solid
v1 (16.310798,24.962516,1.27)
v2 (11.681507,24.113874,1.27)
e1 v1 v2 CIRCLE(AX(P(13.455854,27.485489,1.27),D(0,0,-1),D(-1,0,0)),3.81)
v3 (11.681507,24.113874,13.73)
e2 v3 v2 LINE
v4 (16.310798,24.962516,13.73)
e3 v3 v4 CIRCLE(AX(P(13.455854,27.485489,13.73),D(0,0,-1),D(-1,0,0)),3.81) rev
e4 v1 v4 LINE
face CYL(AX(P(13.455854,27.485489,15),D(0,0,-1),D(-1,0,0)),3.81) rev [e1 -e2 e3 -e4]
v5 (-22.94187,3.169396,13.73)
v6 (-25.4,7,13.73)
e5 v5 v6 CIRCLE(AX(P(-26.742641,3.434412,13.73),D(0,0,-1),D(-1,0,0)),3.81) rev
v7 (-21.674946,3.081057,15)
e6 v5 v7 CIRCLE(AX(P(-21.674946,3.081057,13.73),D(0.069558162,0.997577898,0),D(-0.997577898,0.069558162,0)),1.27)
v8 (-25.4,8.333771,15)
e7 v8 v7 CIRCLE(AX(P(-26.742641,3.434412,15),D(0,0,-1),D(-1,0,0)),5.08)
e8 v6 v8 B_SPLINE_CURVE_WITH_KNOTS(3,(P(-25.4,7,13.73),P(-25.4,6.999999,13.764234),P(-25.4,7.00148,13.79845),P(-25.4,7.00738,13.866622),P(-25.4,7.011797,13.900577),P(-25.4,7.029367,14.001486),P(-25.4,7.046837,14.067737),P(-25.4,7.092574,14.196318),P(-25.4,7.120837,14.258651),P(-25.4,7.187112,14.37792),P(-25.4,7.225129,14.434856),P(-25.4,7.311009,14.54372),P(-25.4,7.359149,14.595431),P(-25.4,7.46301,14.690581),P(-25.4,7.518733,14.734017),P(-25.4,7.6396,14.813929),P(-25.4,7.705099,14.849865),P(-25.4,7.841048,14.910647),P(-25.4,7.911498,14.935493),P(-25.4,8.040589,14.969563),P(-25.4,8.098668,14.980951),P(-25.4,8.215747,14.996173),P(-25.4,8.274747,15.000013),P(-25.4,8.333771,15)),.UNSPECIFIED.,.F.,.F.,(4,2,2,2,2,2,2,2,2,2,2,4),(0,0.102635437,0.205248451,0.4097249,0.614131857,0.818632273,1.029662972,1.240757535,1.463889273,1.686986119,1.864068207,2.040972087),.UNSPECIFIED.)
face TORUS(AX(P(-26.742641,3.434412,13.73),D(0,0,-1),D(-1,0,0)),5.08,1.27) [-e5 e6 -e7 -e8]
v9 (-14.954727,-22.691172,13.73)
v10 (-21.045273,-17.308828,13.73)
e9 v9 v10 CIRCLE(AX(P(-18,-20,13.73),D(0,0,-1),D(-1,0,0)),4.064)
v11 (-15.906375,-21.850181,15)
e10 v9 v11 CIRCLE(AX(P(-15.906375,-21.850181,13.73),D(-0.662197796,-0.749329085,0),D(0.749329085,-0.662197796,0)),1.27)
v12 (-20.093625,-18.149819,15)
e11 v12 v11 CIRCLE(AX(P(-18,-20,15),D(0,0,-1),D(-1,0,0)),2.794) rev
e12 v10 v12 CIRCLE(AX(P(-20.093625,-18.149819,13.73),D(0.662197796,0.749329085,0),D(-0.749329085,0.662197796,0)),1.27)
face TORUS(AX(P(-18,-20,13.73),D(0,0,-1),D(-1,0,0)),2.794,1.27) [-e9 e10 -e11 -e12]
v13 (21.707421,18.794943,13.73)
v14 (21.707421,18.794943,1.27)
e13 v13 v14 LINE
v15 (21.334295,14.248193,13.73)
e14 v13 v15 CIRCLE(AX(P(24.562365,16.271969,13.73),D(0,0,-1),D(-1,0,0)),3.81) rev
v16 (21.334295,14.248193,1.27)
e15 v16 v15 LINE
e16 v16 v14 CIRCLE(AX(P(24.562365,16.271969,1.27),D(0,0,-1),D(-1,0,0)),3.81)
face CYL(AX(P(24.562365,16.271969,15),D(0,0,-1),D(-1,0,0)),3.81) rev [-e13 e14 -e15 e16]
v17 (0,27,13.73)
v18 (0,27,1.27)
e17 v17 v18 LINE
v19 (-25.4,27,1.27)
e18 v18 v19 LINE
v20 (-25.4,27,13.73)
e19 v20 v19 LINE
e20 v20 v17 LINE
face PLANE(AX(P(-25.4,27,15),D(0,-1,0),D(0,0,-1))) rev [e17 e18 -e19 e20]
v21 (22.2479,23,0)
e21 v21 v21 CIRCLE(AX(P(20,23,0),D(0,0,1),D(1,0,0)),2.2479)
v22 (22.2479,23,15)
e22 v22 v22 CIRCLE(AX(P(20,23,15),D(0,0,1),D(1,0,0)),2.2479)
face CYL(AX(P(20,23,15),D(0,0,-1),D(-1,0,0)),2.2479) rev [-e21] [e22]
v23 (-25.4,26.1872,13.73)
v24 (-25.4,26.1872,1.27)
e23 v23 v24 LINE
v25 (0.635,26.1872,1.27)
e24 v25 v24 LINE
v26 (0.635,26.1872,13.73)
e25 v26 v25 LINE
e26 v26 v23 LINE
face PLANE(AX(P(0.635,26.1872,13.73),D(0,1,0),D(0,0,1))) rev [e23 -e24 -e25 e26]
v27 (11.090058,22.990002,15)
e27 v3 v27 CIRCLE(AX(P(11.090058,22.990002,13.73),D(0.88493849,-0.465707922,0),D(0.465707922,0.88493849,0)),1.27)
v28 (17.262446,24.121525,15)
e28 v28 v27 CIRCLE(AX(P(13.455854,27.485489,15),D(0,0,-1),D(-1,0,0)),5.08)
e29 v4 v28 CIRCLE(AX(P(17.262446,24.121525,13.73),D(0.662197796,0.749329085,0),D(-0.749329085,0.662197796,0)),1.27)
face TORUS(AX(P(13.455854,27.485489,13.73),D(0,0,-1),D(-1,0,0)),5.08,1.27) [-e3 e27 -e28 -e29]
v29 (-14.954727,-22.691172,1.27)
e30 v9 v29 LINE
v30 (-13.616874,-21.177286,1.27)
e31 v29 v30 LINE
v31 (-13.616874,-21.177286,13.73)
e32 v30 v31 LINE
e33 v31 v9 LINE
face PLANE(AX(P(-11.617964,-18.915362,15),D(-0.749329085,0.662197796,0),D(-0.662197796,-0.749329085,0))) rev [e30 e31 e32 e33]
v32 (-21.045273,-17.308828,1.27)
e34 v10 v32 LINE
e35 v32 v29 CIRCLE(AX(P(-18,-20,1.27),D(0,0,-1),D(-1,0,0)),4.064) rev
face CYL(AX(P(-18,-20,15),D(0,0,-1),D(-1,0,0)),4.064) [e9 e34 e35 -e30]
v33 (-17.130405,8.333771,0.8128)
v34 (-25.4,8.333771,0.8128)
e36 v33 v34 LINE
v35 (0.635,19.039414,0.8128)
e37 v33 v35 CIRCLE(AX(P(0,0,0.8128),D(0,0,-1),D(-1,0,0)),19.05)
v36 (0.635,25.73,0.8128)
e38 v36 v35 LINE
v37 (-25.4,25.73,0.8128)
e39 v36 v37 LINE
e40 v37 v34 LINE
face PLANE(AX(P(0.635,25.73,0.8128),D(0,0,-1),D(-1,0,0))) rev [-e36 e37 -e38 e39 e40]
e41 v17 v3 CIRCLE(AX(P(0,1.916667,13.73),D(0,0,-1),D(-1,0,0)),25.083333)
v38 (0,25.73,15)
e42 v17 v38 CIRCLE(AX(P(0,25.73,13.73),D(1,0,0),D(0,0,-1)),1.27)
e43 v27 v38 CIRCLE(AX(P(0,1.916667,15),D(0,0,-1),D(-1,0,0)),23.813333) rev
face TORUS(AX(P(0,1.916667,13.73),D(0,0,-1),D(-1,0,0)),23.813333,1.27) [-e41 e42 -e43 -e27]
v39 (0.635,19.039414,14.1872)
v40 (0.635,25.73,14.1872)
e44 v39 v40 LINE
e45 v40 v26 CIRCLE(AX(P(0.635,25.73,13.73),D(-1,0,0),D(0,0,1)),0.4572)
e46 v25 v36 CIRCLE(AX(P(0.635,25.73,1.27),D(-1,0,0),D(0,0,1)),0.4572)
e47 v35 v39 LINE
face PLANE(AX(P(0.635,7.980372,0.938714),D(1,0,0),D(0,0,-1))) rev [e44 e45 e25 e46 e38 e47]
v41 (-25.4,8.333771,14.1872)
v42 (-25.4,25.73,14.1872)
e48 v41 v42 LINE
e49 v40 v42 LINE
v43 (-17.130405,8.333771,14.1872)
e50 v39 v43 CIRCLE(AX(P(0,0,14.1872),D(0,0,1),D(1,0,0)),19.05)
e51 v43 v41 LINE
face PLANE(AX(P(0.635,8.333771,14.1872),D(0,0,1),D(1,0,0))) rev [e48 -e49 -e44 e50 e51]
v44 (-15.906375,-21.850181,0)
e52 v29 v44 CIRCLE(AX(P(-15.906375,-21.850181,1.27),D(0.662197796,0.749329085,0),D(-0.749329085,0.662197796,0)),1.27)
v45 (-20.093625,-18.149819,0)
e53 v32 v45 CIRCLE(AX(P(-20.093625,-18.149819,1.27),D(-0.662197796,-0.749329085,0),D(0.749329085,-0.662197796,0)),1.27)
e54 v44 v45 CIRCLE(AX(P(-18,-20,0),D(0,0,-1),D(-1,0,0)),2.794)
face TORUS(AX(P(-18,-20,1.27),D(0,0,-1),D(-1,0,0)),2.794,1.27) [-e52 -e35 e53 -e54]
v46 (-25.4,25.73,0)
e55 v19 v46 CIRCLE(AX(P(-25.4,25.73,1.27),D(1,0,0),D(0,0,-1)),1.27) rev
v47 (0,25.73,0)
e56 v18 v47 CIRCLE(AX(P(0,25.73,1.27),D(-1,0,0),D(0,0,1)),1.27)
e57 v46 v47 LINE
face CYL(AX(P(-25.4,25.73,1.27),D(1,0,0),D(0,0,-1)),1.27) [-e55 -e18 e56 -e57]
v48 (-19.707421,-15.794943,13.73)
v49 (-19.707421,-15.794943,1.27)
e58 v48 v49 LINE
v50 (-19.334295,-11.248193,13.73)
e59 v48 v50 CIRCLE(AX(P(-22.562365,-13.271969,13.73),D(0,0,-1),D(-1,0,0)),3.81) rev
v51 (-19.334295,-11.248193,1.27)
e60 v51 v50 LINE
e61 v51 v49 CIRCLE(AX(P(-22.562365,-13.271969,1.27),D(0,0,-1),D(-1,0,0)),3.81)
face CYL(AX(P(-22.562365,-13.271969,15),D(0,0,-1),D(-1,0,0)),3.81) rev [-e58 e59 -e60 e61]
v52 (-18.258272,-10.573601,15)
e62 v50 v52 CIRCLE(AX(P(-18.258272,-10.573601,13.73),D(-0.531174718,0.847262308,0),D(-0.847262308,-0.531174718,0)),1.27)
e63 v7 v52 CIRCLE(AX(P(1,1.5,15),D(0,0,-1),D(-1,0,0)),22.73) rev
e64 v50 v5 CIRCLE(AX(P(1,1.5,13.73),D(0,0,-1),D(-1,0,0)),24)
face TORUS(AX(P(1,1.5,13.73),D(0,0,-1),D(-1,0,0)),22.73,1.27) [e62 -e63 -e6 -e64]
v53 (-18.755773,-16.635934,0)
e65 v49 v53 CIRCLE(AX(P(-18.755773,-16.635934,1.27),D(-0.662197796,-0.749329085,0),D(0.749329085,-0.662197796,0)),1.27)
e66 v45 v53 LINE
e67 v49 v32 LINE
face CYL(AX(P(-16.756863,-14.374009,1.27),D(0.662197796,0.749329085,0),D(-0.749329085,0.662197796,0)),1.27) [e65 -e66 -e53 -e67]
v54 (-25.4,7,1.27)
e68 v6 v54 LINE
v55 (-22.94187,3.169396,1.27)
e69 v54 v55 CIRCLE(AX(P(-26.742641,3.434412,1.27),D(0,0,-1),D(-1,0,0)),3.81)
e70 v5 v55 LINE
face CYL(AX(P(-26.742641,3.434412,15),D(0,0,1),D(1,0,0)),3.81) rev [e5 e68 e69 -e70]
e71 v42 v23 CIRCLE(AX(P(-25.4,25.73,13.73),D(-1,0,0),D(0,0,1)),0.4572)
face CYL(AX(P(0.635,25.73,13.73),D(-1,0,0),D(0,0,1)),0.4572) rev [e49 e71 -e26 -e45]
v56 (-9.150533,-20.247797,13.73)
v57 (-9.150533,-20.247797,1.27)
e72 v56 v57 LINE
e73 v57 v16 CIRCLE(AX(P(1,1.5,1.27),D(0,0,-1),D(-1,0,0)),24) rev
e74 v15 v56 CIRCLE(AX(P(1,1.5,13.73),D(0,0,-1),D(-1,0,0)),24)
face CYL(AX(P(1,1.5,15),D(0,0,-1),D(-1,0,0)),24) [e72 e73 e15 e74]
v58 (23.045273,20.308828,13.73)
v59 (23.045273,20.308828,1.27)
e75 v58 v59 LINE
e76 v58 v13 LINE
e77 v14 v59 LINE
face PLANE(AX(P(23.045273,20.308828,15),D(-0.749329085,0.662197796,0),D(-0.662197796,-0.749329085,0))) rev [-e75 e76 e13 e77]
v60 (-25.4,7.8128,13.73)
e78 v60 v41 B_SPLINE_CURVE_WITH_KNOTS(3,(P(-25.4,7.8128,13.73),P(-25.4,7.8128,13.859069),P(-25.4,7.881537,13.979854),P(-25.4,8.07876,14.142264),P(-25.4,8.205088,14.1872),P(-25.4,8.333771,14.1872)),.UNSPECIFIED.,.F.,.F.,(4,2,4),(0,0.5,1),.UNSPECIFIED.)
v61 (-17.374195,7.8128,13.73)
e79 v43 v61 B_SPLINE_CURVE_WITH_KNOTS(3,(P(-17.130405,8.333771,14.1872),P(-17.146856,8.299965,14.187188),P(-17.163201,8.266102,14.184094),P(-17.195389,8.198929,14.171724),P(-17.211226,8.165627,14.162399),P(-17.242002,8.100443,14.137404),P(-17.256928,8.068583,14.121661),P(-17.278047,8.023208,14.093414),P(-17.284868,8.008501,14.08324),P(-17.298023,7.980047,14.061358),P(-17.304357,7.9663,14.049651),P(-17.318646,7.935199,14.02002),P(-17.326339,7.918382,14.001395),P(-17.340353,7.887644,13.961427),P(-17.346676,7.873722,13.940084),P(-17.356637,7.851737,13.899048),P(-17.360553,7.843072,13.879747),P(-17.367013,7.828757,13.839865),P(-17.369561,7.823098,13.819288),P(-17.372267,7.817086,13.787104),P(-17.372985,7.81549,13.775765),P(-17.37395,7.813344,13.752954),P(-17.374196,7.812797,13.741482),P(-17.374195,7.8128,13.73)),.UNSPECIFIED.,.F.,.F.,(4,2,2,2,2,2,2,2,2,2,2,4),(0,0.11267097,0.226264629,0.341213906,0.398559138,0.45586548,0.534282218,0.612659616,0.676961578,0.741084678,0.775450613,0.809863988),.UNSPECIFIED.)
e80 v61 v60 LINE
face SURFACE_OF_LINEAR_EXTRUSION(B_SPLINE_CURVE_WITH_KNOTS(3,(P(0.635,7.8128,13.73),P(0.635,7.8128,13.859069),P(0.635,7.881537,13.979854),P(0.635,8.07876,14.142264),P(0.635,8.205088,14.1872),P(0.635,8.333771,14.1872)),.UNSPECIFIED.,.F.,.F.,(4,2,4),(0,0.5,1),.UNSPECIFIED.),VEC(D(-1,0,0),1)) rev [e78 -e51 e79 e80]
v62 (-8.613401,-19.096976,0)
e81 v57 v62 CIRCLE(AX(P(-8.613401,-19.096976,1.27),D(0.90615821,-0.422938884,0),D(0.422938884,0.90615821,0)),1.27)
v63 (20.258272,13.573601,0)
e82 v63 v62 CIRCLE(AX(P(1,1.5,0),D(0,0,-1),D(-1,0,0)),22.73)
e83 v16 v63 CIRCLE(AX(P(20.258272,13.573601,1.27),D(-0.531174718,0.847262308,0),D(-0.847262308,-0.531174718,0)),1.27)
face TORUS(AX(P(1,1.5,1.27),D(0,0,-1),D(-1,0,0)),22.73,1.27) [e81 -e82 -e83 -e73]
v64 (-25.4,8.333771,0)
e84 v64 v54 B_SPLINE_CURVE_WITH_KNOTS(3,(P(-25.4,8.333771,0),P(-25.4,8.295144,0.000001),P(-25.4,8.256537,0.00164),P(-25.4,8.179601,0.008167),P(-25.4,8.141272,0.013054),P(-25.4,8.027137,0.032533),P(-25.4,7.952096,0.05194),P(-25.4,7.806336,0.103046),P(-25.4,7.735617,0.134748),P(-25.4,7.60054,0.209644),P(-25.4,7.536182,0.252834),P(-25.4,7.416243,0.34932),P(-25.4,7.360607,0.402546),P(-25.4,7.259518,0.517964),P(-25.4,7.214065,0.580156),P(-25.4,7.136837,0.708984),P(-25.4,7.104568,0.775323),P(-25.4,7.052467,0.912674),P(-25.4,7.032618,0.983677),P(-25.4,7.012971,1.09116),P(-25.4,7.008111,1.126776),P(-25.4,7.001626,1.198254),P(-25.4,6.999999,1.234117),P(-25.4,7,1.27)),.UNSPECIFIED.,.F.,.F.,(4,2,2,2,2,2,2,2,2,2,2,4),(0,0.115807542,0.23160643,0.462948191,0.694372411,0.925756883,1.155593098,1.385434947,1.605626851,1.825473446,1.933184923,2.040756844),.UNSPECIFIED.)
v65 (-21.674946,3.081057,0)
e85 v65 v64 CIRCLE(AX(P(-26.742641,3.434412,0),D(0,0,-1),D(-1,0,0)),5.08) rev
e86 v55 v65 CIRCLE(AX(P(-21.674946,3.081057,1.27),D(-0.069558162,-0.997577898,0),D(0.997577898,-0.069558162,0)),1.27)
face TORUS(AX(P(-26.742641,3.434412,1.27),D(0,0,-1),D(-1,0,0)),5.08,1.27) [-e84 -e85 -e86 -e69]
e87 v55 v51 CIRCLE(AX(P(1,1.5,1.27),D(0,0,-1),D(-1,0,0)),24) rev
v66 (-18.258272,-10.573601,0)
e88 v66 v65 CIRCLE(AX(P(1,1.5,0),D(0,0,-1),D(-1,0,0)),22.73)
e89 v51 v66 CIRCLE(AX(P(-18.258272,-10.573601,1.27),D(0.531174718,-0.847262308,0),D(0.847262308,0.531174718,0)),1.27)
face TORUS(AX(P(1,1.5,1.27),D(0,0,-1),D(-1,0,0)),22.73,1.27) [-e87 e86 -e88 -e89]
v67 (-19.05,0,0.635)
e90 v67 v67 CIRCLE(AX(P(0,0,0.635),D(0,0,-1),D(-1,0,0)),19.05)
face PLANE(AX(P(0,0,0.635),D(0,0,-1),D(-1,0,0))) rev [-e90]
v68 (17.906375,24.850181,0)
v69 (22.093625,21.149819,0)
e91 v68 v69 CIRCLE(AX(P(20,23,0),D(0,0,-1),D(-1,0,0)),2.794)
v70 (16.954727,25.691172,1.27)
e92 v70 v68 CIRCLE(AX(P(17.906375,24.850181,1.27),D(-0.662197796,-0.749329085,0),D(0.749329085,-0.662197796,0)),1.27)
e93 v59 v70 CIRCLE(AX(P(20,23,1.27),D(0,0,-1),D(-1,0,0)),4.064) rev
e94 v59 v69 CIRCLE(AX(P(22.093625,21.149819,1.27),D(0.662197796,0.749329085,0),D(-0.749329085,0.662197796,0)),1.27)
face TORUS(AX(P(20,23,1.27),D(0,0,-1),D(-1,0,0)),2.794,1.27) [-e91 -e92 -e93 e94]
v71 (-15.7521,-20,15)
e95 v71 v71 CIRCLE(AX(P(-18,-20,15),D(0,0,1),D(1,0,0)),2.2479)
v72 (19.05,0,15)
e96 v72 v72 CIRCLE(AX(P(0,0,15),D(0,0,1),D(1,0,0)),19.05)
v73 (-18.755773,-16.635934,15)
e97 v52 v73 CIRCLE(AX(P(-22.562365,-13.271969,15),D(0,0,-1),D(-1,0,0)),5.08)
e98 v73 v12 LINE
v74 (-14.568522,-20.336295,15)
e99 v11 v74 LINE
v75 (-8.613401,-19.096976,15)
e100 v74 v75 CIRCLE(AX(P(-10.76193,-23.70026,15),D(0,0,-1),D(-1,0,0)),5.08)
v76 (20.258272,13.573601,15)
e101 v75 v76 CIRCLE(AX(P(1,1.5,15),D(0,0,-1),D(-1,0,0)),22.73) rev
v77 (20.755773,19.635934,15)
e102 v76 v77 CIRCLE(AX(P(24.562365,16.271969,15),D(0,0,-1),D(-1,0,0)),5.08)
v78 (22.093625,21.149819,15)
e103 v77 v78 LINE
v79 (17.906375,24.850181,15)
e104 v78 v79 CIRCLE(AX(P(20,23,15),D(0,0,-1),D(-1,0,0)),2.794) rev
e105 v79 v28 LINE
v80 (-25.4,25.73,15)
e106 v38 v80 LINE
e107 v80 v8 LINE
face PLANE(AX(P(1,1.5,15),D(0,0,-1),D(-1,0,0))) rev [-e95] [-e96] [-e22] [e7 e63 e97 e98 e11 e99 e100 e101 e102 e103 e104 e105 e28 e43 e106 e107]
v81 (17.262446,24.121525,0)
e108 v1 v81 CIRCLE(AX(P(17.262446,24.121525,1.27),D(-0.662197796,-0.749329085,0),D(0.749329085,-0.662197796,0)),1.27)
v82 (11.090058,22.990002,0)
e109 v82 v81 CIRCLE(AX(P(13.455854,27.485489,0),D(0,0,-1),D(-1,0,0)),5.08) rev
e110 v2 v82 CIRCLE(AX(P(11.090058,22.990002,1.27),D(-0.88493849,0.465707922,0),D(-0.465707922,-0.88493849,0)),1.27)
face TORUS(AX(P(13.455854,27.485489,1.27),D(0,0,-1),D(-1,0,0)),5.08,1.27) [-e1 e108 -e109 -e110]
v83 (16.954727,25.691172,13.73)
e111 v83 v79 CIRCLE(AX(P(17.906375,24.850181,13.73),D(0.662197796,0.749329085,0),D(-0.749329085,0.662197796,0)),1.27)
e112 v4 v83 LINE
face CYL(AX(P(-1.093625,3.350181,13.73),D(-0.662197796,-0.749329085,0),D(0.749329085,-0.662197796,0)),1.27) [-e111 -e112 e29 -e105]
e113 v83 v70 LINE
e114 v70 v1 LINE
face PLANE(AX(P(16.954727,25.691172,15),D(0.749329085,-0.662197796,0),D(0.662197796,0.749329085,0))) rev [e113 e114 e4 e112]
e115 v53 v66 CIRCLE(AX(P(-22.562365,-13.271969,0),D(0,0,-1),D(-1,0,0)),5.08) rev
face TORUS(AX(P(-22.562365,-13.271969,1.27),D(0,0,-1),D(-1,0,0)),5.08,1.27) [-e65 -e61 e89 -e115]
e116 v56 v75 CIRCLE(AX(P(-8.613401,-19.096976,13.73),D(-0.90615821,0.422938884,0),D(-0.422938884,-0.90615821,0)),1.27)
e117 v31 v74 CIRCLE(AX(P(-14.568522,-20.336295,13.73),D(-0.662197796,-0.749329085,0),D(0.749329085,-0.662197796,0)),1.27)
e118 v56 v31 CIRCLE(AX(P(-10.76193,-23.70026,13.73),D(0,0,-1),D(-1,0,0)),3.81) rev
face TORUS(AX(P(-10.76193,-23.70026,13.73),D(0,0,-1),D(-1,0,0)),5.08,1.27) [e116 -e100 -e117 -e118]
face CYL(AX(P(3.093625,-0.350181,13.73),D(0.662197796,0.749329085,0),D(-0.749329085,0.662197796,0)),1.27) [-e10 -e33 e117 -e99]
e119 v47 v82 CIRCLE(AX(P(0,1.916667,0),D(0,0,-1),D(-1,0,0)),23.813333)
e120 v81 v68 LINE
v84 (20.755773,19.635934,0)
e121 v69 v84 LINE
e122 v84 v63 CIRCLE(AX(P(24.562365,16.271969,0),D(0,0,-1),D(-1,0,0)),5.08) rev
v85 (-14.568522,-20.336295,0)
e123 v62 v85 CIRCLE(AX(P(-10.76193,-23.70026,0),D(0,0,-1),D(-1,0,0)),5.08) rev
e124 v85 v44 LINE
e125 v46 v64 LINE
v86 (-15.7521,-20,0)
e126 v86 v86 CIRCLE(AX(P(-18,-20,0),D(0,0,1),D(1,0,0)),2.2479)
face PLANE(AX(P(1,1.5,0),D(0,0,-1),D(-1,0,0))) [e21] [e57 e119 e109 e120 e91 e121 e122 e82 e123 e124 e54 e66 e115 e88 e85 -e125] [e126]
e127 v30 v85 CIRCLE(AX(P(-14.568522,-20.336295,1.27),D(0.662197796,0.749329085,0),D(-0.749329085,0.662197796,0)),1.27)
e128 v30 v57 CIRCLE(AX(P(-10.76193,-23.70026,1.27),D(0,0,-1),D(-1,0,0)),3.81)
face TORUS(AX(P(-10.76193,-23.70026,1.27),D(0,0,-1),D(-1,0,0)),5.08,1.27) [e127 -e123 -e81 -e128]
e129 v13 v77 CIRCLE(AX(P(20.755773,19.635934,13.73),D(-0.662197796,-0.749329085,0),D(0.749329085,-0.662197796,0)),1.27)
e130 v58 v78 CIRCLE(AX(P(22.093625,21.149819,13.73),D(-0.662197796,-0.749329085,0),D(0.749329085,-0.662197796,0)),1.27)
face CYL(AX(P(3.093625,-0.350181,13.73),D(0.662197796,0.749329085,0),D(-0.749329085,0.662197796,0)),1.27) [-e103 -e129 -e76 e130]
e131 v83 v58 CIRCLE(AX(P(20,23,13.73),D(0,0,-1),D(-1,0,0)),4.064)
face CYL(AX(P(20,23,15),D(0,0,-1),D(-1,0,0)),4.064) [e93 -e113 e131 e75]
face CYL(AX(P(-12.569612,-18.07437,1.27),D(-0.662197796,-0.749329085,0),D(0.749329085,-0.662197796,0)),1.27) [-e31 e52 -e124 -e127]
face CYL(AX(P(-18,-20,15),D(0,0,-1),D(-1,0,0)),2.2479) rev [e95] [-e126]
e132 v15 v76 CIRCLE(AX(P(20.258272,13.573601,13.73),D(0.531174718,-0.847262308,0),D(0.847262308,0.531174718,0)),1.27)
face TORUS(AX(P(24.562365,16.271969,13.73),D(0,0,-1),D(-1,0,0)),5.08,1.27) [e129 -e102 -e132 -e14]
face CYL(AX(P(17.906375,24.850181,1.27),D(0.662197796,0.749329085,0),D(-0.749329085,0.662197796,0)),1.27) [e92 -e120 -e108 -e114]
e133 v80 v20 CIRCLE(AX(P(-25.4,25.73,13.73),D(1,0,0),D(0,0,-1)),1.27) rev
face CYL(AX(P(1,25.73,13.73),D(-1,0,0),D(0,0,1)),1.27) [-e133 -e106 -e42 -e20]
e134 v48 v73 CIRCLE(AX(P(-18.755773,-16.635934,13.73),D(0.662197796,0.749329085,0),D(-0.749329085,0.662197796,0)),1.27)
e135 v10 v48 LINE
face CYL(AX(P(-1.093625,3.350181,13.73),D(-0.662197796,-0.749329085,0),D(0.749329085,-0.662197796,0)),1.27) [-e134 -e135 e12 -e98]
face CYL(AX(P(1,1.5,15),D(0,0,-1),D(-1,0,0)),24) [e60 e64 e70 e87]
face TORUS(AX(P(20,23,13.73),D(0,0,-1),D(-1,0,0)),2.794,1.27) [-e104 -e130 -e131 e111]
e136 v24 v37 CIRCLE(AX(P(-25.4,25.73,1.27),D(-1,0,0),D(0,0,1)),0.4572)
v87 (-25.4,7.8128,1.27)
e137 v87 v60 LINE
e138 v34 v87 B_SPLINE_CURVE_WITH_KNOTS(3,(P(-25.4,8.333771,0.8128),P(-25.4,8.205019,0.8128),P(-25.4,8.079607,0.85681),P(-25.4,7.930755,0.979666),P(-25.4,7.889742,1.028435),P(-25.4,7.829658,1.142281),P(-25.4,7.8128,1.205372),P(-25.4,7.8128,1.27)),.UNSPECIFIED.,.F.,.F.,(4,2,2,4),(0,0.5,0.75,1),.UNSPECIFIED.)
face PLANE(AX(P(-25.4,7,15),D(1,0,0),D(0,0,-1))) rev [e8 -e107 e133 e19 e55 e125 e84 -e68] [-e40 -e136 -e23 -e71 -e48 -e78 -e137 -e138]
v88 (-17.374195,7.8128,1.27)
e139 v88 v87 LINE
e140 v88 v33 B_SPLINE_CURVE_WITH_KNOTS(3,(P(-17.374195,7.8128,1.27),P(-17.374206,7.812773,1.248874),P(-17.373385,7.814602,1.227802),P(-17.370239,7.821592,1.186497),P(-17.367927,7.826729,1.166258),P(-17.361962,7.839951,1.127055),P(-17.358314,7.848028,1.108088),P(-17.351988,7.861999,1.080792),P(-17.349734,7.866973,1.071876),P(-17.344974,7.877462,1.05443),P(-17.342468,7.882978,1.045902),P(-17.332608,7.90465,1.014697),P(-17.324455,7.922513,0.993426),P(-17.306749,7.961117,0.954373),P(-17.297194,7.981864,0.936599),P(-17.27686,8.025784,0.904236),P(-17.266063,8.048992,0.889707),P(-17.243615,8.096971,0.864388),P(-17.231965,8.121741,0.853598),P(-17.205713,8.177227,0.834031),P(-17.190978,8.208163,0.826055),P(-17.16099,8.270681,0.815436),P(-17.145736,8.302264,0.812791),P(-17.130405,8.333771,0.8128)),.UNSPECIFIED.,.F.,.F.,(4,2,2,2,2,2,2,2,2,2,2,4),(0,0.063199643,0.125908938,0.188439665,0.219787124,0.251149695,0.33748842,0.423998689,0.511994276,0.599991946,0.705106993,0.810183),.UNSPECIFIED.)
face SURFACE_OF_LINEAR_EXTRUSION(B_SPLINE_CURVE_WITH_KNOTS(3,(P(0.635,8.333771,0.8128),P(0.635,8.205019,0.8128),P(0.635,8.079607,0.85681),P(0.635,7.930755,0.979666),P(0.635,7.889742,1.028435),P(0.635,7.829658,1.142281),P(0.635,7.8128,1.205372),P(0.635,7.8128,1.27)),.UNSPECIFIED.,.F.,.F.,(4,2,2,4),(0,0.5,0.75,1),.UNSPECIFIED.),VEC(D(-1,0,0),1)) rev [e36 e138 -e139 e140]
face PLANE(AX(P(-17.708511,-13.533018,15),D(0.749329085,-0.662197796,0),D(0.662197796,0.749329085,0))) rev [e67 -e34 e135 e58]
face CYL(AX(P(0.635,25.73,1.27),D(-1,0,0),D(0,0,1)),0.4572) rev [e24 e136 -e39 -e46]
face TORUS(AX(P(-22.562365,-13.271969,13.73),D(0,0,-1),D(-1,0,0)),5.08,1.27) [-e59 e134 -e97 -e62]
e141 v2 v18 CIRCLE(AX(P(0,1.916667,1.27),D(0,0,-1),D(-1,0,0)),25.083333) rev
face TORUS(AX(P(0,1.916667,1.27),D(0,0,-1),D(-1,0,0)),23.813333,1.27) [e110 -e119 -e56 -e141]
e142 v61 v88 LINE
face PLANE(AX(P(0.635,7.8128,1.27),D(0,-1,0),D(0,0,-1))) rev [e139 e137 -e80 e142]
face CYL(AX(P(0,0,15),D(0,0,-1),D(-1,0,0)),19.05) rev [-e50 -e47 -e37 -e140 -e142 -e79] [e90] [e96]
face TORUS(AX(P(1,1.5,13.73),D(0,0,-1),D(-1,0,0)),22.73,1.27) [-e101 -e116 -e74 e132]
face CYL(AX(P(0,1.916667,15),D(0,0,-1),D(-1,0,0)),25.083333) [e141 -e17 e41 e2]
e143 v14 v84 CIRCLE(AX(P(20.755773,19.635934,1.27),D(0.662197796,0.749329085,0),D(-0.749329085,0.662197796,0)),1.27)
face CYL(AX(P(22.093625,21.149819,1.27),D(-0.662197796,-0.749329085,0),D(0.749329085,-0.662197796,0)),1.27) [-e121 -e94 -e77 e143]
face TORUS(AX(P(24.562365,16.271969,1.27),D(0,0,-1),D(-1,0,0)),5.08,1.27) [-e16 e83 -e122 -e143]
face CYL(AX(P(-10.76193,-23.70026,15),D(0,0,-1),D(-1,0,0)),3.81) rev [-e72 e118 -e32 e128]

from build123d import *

# Parameters (mm, degrees)
SKETCH1_R           = 19.05
SKETCH1_R_2         = 2.2479
BOSS_EXTRUDE2_DEPTH = 15
FILLET1_R           = 3.81
FILLET2_R           = 1.27
SKETCH2_R           = 19.05
BOSS_EXTRUDE3_DEPTH = 0.635
CUT_EXTRUDE1_DEPTH  = 26.035


with BuildPart() as part:
    # Sketch1 → Boss-Extrude2 (new body)
    with BuildSketch(Plane.XY):
        with BuildLine():
            Line((-25.4, 7), (-25.4, 27))
            Line((-25.4, 27), (0, 27))
            ThreePointArc((0, 27), (7.440223944, 25.871137622), (14.210761067, 22.586158219))
            Line((14.210761067, 22.586158219), (16.954726597, 25.691171845))
            ThreePointArc((16.954726597, 25.691171845), (22.691171845, 26.045273403), (23.045273403, 20.308828155))
            Line((23.045273403, 20.308828155), (19.708510775, 16.533017813))
            ThreePointArc((19.708510775, 16.533017813), (18.983898052, -14.392747115), (-11.617963969, -18.915361503))
            Line((-11.617963969, -18.915361503), (-14.954726597, -22.691171845))
            ThreePointArc((-14.954726597, -22.691171845), (-20.691171845, -23.045273403), (-21.045273403, -17.308828155))
            Line((-21.045273403, -17.308828155), (-17.708510775, -13.533017813))
            ThreePointArc((-17.708510775, -13.533017813), (-22.406586632, -3.803932714), (-22.361292772, 7))
            Line((-22.361292772, 7), (-25.4, 7))
        make_face()
        Circle(SKETCH1_R, mode=Mode.SUBTRACT)
        with Locations((-18, -20)):
            Circle(SKETCH1_R_2, mode=Mode.SUBTRACT)
        with Locations((20, 23)):
            Circle(SKETCH1_R_2, mode=Mode.SUBTRACT)
    extrude(amount=BOSS_EXTRUDE2_DEPTH)

    # Fillet1
    # the kernel refuses this fillet: 3.81 mm, written as the material it adds along each edge
    with BuildSketch(Plane(origin=(14.210761067, 22.586158219, 0), x_dir=(-0.8559717678532165, 0.517022564921725, 0), z_dir=(0, 0, 1))) as fillet1_piece_1:
        with BuildLine():
            CenterArc((3.179243746, -3.803385338), FILLET1_R, 93.37669496, 76.288341739)
            Line((-0.568941844, -3.119861536), (-0.643905555, -3.10619106))
            Line((-0.643905555, -3.10619106), (-0.074963712, 0.013670476))
            Line((-0.074963712, 0.013670476), (0.004488206, 0.076067707))
            ThreePointArc((0.004488206, 0.076067707), (1.477416735, 0.032652027), (2.950345264, 0.076067707))
            Line((2.950345264, 0.076067707), (2.95483347, 0))
        make_face()
    extrude(amount=15)
    with BuildSketch(Plane(origin=(19.708510775, 16.533017813, 0), x_dir=(0.662197796471711, 0.7493290854811459, 0), z_dir=(0, 0, 1)), Plane(origin=(-17.708510775, -13.533017813, 0), x_dir=(-0.6621977964717104, -0.7493290854811463, 0), z_dir=(0, 0, 1))) as fillet1_piece_2:
        with BuildLine():
            CenterArc((3.018599897, -3.81), FILLET1_R, 90, 73.552565618)
            Line((-0.635494519, -2.731253506), (-0.708576407, -2.709678576))
            ThreePointArc((-0.708576407, -2.709678576), (-0.352039979, -1.357647693), (-0.075099583, 0.0129032))
            Line((-0.075099583, 0.0129032), (0, 0.0762))
            Line((0, 0.0762), (3.018599897, 0.0762))
            Line((3.018599897, 0.0762), (3.018599897, 0))
        make_face()
    extrude(amount=15)
    with BuildSketch(Plane(origin=(-11.617963969, -18.915361503, 0), x_dir=(0.8799019811914369, -0.4751552414689165, 0), z_dir=(0, 0, 1))) as fillet1_piece_3:
        with BuildLine():
            CenterArc((3.026795184, -3.803492639), FILLET1_R, 93.349187231, 73.552565618)
            Line((-0.684079668, -2.940064684), (-0.758297165, -2.922796125))
            Line((-0.758297165, -2.922796125), (-0.074217497, 0.017268559))
            Line((-0.074217497, 0.017268559), (0.004451685, 0.076069853))
            ThreePointArc((0.004451685, 0.076069853), (1.40210547, 0.035208749), (2.799759255, 0.076069853))
            Line((2.799759255, 0.076069853), (2.80421094, 0))
        make_face()
    extrude(amount=15)
    with BuildSketch(Plane(origin=(-22.361292772, 7, 0), x_dir=(-0.14985135420015194, -0.9887085372567492, 0), z_dir=(0, 0, 1))) as fillet1_piece_4:
        with BuildLine():
            CenterArc((4.18187782, -3.797568614), FILLET1_R, 94.629702487, 73.354472459)
            Line((0.455354393, -3.004395778), (0.380823925, -2.988532321))
            ThreePointArc((0.380823925, -2.988532321), (0.152337606, -1.513616562), (-0.075339591, -0.011418673))
            Line((-0.075339591, -0.011418673), (0.006150533, 0.075951372))
            ThreePointArc((0.006150533, 0.075951372), (1.937175597, -0.002107946), (3.868200662, 0.075951372))
            Line((3.868200662, 0.075951372), (3.874351194, 0))
        make_face()
    extrude(amount=15)

    # Fillet2
    fillet2_edges = [part.edges().sort_by_distance(p)[0] for p in [
        (-12.7, 27, 0),
        (16.632762316, 25.326843843, 0),
        (22.691171845, 26.045273403, 0),
        (-20.691171845, -23.045273403, 15),
        (-14.285800383, -21.934229024, 0),
        (-20.691171845, -23.045273403, 0),
        (-14.285800383, -21.934229024, 15),
        (22.691171845, 26.045273403, 15),
        (16.632762316, 25.326843843, 15),
        (-12.7, 27, 15),
        (6.016380372, 26.267781186, 0),
        (6.016380372, 26.267781186, 15),
        (22.37634719, 19.551885334, 0),
        (22.37634719, 19.551885334, 15),
        (18.983898052, -14.392747115, 0),
        (18.983898052, -14.392747115, 15),
        (-20.37634719, -16.551885334, 0),
        (-20.37634719, -16.551885334, 15),
        (-22.282212408, -4.325683257, 0),
        (-22.282212408, -4.325683257, 15),
        (14.142855385, 23.73793966, 0),
        (14.142855385, 23.73793966, 15),
        (20.765129655, 16.58358617, 0),
        (20.765129655, 16.58358617, 15),
        (-11.538196809, -19.970177987, 0),
        (-11.538196809, -19.970177987, 15),
        (-18.765129655, -13.58358617, 0),
        (-18.765129655, -13.58358617, 15),
        (-23.536076727, 5.492091628, 0),
        (-23.536076727, 5.492091628, 15),
    ]]
    fillet(fillet2_edges, radius=FILLET2_R)

    # Sketch2 → Boss-Extrude3 (add)
    with BuildSketch(Plane(origin=(0, 0, 0), x_dir=(-1, 0, 0), z_dir=(0, 0, -1))):
        Circle(SKETCH2_R)
    extrude(amount=-BOSS_EXTRUDE3_DEPTH)

    # Sketch4 → Cut-Extrude1 (cut)
    with BuildSketch(Plane.ZY.offset(25.4)):
        with BuildLine():
            Line((1.27, 7.8128), (13.73, 7.8128))
            add(Edge.make_bspline(
                [(13.73, 7.8128), (13.859068661, 7.8128), (13.979854215, 7.8815369), (14.14226404, 8.07875966), (14.1872, 8.205087608), (14.1872, 8.333771051)],
                knots=[0, 0, 0, 0, 0.5, 0.5, 1, 1, 1, 1], degree=3))
            Line((14.1872, 8.333771051), (14.1872, 25.73))
            ThreePointArc((14.1872, 25.73), (14.05328922, 26.05328922), (13.73, 26.1872))
            Line((13.73, 26.1872), (1.27, 26.1872))
            ThreePointArc((1.27, 26.1872), (0.94671078, 26.05328922), (0.8128, 25.73))
            Line((0.8128, 25.73), (0.8128, 8.333771051))
            add(Edge.make_bspline(
                [(0.8128, 8.333771051), (0.8128, 8.205019375), (0.856810484, 8.079606616), (0.979665893, 7.930755304), (1.028434999, 7.889741659), (1.142281289, 7.829657638), (1.205371656, 7.8128), (1.27, 7.8128)],
                knots=[0, 0, 0, 0, 0.5, 0.5, 0.75, 0.75, 1, 1, 1, 1], degree=3))
        make_face()
    extrude(amount=-CUT_EXTRUDE1_DEPTH, mode=Mode.SUBTRACT)


solid = part.part
